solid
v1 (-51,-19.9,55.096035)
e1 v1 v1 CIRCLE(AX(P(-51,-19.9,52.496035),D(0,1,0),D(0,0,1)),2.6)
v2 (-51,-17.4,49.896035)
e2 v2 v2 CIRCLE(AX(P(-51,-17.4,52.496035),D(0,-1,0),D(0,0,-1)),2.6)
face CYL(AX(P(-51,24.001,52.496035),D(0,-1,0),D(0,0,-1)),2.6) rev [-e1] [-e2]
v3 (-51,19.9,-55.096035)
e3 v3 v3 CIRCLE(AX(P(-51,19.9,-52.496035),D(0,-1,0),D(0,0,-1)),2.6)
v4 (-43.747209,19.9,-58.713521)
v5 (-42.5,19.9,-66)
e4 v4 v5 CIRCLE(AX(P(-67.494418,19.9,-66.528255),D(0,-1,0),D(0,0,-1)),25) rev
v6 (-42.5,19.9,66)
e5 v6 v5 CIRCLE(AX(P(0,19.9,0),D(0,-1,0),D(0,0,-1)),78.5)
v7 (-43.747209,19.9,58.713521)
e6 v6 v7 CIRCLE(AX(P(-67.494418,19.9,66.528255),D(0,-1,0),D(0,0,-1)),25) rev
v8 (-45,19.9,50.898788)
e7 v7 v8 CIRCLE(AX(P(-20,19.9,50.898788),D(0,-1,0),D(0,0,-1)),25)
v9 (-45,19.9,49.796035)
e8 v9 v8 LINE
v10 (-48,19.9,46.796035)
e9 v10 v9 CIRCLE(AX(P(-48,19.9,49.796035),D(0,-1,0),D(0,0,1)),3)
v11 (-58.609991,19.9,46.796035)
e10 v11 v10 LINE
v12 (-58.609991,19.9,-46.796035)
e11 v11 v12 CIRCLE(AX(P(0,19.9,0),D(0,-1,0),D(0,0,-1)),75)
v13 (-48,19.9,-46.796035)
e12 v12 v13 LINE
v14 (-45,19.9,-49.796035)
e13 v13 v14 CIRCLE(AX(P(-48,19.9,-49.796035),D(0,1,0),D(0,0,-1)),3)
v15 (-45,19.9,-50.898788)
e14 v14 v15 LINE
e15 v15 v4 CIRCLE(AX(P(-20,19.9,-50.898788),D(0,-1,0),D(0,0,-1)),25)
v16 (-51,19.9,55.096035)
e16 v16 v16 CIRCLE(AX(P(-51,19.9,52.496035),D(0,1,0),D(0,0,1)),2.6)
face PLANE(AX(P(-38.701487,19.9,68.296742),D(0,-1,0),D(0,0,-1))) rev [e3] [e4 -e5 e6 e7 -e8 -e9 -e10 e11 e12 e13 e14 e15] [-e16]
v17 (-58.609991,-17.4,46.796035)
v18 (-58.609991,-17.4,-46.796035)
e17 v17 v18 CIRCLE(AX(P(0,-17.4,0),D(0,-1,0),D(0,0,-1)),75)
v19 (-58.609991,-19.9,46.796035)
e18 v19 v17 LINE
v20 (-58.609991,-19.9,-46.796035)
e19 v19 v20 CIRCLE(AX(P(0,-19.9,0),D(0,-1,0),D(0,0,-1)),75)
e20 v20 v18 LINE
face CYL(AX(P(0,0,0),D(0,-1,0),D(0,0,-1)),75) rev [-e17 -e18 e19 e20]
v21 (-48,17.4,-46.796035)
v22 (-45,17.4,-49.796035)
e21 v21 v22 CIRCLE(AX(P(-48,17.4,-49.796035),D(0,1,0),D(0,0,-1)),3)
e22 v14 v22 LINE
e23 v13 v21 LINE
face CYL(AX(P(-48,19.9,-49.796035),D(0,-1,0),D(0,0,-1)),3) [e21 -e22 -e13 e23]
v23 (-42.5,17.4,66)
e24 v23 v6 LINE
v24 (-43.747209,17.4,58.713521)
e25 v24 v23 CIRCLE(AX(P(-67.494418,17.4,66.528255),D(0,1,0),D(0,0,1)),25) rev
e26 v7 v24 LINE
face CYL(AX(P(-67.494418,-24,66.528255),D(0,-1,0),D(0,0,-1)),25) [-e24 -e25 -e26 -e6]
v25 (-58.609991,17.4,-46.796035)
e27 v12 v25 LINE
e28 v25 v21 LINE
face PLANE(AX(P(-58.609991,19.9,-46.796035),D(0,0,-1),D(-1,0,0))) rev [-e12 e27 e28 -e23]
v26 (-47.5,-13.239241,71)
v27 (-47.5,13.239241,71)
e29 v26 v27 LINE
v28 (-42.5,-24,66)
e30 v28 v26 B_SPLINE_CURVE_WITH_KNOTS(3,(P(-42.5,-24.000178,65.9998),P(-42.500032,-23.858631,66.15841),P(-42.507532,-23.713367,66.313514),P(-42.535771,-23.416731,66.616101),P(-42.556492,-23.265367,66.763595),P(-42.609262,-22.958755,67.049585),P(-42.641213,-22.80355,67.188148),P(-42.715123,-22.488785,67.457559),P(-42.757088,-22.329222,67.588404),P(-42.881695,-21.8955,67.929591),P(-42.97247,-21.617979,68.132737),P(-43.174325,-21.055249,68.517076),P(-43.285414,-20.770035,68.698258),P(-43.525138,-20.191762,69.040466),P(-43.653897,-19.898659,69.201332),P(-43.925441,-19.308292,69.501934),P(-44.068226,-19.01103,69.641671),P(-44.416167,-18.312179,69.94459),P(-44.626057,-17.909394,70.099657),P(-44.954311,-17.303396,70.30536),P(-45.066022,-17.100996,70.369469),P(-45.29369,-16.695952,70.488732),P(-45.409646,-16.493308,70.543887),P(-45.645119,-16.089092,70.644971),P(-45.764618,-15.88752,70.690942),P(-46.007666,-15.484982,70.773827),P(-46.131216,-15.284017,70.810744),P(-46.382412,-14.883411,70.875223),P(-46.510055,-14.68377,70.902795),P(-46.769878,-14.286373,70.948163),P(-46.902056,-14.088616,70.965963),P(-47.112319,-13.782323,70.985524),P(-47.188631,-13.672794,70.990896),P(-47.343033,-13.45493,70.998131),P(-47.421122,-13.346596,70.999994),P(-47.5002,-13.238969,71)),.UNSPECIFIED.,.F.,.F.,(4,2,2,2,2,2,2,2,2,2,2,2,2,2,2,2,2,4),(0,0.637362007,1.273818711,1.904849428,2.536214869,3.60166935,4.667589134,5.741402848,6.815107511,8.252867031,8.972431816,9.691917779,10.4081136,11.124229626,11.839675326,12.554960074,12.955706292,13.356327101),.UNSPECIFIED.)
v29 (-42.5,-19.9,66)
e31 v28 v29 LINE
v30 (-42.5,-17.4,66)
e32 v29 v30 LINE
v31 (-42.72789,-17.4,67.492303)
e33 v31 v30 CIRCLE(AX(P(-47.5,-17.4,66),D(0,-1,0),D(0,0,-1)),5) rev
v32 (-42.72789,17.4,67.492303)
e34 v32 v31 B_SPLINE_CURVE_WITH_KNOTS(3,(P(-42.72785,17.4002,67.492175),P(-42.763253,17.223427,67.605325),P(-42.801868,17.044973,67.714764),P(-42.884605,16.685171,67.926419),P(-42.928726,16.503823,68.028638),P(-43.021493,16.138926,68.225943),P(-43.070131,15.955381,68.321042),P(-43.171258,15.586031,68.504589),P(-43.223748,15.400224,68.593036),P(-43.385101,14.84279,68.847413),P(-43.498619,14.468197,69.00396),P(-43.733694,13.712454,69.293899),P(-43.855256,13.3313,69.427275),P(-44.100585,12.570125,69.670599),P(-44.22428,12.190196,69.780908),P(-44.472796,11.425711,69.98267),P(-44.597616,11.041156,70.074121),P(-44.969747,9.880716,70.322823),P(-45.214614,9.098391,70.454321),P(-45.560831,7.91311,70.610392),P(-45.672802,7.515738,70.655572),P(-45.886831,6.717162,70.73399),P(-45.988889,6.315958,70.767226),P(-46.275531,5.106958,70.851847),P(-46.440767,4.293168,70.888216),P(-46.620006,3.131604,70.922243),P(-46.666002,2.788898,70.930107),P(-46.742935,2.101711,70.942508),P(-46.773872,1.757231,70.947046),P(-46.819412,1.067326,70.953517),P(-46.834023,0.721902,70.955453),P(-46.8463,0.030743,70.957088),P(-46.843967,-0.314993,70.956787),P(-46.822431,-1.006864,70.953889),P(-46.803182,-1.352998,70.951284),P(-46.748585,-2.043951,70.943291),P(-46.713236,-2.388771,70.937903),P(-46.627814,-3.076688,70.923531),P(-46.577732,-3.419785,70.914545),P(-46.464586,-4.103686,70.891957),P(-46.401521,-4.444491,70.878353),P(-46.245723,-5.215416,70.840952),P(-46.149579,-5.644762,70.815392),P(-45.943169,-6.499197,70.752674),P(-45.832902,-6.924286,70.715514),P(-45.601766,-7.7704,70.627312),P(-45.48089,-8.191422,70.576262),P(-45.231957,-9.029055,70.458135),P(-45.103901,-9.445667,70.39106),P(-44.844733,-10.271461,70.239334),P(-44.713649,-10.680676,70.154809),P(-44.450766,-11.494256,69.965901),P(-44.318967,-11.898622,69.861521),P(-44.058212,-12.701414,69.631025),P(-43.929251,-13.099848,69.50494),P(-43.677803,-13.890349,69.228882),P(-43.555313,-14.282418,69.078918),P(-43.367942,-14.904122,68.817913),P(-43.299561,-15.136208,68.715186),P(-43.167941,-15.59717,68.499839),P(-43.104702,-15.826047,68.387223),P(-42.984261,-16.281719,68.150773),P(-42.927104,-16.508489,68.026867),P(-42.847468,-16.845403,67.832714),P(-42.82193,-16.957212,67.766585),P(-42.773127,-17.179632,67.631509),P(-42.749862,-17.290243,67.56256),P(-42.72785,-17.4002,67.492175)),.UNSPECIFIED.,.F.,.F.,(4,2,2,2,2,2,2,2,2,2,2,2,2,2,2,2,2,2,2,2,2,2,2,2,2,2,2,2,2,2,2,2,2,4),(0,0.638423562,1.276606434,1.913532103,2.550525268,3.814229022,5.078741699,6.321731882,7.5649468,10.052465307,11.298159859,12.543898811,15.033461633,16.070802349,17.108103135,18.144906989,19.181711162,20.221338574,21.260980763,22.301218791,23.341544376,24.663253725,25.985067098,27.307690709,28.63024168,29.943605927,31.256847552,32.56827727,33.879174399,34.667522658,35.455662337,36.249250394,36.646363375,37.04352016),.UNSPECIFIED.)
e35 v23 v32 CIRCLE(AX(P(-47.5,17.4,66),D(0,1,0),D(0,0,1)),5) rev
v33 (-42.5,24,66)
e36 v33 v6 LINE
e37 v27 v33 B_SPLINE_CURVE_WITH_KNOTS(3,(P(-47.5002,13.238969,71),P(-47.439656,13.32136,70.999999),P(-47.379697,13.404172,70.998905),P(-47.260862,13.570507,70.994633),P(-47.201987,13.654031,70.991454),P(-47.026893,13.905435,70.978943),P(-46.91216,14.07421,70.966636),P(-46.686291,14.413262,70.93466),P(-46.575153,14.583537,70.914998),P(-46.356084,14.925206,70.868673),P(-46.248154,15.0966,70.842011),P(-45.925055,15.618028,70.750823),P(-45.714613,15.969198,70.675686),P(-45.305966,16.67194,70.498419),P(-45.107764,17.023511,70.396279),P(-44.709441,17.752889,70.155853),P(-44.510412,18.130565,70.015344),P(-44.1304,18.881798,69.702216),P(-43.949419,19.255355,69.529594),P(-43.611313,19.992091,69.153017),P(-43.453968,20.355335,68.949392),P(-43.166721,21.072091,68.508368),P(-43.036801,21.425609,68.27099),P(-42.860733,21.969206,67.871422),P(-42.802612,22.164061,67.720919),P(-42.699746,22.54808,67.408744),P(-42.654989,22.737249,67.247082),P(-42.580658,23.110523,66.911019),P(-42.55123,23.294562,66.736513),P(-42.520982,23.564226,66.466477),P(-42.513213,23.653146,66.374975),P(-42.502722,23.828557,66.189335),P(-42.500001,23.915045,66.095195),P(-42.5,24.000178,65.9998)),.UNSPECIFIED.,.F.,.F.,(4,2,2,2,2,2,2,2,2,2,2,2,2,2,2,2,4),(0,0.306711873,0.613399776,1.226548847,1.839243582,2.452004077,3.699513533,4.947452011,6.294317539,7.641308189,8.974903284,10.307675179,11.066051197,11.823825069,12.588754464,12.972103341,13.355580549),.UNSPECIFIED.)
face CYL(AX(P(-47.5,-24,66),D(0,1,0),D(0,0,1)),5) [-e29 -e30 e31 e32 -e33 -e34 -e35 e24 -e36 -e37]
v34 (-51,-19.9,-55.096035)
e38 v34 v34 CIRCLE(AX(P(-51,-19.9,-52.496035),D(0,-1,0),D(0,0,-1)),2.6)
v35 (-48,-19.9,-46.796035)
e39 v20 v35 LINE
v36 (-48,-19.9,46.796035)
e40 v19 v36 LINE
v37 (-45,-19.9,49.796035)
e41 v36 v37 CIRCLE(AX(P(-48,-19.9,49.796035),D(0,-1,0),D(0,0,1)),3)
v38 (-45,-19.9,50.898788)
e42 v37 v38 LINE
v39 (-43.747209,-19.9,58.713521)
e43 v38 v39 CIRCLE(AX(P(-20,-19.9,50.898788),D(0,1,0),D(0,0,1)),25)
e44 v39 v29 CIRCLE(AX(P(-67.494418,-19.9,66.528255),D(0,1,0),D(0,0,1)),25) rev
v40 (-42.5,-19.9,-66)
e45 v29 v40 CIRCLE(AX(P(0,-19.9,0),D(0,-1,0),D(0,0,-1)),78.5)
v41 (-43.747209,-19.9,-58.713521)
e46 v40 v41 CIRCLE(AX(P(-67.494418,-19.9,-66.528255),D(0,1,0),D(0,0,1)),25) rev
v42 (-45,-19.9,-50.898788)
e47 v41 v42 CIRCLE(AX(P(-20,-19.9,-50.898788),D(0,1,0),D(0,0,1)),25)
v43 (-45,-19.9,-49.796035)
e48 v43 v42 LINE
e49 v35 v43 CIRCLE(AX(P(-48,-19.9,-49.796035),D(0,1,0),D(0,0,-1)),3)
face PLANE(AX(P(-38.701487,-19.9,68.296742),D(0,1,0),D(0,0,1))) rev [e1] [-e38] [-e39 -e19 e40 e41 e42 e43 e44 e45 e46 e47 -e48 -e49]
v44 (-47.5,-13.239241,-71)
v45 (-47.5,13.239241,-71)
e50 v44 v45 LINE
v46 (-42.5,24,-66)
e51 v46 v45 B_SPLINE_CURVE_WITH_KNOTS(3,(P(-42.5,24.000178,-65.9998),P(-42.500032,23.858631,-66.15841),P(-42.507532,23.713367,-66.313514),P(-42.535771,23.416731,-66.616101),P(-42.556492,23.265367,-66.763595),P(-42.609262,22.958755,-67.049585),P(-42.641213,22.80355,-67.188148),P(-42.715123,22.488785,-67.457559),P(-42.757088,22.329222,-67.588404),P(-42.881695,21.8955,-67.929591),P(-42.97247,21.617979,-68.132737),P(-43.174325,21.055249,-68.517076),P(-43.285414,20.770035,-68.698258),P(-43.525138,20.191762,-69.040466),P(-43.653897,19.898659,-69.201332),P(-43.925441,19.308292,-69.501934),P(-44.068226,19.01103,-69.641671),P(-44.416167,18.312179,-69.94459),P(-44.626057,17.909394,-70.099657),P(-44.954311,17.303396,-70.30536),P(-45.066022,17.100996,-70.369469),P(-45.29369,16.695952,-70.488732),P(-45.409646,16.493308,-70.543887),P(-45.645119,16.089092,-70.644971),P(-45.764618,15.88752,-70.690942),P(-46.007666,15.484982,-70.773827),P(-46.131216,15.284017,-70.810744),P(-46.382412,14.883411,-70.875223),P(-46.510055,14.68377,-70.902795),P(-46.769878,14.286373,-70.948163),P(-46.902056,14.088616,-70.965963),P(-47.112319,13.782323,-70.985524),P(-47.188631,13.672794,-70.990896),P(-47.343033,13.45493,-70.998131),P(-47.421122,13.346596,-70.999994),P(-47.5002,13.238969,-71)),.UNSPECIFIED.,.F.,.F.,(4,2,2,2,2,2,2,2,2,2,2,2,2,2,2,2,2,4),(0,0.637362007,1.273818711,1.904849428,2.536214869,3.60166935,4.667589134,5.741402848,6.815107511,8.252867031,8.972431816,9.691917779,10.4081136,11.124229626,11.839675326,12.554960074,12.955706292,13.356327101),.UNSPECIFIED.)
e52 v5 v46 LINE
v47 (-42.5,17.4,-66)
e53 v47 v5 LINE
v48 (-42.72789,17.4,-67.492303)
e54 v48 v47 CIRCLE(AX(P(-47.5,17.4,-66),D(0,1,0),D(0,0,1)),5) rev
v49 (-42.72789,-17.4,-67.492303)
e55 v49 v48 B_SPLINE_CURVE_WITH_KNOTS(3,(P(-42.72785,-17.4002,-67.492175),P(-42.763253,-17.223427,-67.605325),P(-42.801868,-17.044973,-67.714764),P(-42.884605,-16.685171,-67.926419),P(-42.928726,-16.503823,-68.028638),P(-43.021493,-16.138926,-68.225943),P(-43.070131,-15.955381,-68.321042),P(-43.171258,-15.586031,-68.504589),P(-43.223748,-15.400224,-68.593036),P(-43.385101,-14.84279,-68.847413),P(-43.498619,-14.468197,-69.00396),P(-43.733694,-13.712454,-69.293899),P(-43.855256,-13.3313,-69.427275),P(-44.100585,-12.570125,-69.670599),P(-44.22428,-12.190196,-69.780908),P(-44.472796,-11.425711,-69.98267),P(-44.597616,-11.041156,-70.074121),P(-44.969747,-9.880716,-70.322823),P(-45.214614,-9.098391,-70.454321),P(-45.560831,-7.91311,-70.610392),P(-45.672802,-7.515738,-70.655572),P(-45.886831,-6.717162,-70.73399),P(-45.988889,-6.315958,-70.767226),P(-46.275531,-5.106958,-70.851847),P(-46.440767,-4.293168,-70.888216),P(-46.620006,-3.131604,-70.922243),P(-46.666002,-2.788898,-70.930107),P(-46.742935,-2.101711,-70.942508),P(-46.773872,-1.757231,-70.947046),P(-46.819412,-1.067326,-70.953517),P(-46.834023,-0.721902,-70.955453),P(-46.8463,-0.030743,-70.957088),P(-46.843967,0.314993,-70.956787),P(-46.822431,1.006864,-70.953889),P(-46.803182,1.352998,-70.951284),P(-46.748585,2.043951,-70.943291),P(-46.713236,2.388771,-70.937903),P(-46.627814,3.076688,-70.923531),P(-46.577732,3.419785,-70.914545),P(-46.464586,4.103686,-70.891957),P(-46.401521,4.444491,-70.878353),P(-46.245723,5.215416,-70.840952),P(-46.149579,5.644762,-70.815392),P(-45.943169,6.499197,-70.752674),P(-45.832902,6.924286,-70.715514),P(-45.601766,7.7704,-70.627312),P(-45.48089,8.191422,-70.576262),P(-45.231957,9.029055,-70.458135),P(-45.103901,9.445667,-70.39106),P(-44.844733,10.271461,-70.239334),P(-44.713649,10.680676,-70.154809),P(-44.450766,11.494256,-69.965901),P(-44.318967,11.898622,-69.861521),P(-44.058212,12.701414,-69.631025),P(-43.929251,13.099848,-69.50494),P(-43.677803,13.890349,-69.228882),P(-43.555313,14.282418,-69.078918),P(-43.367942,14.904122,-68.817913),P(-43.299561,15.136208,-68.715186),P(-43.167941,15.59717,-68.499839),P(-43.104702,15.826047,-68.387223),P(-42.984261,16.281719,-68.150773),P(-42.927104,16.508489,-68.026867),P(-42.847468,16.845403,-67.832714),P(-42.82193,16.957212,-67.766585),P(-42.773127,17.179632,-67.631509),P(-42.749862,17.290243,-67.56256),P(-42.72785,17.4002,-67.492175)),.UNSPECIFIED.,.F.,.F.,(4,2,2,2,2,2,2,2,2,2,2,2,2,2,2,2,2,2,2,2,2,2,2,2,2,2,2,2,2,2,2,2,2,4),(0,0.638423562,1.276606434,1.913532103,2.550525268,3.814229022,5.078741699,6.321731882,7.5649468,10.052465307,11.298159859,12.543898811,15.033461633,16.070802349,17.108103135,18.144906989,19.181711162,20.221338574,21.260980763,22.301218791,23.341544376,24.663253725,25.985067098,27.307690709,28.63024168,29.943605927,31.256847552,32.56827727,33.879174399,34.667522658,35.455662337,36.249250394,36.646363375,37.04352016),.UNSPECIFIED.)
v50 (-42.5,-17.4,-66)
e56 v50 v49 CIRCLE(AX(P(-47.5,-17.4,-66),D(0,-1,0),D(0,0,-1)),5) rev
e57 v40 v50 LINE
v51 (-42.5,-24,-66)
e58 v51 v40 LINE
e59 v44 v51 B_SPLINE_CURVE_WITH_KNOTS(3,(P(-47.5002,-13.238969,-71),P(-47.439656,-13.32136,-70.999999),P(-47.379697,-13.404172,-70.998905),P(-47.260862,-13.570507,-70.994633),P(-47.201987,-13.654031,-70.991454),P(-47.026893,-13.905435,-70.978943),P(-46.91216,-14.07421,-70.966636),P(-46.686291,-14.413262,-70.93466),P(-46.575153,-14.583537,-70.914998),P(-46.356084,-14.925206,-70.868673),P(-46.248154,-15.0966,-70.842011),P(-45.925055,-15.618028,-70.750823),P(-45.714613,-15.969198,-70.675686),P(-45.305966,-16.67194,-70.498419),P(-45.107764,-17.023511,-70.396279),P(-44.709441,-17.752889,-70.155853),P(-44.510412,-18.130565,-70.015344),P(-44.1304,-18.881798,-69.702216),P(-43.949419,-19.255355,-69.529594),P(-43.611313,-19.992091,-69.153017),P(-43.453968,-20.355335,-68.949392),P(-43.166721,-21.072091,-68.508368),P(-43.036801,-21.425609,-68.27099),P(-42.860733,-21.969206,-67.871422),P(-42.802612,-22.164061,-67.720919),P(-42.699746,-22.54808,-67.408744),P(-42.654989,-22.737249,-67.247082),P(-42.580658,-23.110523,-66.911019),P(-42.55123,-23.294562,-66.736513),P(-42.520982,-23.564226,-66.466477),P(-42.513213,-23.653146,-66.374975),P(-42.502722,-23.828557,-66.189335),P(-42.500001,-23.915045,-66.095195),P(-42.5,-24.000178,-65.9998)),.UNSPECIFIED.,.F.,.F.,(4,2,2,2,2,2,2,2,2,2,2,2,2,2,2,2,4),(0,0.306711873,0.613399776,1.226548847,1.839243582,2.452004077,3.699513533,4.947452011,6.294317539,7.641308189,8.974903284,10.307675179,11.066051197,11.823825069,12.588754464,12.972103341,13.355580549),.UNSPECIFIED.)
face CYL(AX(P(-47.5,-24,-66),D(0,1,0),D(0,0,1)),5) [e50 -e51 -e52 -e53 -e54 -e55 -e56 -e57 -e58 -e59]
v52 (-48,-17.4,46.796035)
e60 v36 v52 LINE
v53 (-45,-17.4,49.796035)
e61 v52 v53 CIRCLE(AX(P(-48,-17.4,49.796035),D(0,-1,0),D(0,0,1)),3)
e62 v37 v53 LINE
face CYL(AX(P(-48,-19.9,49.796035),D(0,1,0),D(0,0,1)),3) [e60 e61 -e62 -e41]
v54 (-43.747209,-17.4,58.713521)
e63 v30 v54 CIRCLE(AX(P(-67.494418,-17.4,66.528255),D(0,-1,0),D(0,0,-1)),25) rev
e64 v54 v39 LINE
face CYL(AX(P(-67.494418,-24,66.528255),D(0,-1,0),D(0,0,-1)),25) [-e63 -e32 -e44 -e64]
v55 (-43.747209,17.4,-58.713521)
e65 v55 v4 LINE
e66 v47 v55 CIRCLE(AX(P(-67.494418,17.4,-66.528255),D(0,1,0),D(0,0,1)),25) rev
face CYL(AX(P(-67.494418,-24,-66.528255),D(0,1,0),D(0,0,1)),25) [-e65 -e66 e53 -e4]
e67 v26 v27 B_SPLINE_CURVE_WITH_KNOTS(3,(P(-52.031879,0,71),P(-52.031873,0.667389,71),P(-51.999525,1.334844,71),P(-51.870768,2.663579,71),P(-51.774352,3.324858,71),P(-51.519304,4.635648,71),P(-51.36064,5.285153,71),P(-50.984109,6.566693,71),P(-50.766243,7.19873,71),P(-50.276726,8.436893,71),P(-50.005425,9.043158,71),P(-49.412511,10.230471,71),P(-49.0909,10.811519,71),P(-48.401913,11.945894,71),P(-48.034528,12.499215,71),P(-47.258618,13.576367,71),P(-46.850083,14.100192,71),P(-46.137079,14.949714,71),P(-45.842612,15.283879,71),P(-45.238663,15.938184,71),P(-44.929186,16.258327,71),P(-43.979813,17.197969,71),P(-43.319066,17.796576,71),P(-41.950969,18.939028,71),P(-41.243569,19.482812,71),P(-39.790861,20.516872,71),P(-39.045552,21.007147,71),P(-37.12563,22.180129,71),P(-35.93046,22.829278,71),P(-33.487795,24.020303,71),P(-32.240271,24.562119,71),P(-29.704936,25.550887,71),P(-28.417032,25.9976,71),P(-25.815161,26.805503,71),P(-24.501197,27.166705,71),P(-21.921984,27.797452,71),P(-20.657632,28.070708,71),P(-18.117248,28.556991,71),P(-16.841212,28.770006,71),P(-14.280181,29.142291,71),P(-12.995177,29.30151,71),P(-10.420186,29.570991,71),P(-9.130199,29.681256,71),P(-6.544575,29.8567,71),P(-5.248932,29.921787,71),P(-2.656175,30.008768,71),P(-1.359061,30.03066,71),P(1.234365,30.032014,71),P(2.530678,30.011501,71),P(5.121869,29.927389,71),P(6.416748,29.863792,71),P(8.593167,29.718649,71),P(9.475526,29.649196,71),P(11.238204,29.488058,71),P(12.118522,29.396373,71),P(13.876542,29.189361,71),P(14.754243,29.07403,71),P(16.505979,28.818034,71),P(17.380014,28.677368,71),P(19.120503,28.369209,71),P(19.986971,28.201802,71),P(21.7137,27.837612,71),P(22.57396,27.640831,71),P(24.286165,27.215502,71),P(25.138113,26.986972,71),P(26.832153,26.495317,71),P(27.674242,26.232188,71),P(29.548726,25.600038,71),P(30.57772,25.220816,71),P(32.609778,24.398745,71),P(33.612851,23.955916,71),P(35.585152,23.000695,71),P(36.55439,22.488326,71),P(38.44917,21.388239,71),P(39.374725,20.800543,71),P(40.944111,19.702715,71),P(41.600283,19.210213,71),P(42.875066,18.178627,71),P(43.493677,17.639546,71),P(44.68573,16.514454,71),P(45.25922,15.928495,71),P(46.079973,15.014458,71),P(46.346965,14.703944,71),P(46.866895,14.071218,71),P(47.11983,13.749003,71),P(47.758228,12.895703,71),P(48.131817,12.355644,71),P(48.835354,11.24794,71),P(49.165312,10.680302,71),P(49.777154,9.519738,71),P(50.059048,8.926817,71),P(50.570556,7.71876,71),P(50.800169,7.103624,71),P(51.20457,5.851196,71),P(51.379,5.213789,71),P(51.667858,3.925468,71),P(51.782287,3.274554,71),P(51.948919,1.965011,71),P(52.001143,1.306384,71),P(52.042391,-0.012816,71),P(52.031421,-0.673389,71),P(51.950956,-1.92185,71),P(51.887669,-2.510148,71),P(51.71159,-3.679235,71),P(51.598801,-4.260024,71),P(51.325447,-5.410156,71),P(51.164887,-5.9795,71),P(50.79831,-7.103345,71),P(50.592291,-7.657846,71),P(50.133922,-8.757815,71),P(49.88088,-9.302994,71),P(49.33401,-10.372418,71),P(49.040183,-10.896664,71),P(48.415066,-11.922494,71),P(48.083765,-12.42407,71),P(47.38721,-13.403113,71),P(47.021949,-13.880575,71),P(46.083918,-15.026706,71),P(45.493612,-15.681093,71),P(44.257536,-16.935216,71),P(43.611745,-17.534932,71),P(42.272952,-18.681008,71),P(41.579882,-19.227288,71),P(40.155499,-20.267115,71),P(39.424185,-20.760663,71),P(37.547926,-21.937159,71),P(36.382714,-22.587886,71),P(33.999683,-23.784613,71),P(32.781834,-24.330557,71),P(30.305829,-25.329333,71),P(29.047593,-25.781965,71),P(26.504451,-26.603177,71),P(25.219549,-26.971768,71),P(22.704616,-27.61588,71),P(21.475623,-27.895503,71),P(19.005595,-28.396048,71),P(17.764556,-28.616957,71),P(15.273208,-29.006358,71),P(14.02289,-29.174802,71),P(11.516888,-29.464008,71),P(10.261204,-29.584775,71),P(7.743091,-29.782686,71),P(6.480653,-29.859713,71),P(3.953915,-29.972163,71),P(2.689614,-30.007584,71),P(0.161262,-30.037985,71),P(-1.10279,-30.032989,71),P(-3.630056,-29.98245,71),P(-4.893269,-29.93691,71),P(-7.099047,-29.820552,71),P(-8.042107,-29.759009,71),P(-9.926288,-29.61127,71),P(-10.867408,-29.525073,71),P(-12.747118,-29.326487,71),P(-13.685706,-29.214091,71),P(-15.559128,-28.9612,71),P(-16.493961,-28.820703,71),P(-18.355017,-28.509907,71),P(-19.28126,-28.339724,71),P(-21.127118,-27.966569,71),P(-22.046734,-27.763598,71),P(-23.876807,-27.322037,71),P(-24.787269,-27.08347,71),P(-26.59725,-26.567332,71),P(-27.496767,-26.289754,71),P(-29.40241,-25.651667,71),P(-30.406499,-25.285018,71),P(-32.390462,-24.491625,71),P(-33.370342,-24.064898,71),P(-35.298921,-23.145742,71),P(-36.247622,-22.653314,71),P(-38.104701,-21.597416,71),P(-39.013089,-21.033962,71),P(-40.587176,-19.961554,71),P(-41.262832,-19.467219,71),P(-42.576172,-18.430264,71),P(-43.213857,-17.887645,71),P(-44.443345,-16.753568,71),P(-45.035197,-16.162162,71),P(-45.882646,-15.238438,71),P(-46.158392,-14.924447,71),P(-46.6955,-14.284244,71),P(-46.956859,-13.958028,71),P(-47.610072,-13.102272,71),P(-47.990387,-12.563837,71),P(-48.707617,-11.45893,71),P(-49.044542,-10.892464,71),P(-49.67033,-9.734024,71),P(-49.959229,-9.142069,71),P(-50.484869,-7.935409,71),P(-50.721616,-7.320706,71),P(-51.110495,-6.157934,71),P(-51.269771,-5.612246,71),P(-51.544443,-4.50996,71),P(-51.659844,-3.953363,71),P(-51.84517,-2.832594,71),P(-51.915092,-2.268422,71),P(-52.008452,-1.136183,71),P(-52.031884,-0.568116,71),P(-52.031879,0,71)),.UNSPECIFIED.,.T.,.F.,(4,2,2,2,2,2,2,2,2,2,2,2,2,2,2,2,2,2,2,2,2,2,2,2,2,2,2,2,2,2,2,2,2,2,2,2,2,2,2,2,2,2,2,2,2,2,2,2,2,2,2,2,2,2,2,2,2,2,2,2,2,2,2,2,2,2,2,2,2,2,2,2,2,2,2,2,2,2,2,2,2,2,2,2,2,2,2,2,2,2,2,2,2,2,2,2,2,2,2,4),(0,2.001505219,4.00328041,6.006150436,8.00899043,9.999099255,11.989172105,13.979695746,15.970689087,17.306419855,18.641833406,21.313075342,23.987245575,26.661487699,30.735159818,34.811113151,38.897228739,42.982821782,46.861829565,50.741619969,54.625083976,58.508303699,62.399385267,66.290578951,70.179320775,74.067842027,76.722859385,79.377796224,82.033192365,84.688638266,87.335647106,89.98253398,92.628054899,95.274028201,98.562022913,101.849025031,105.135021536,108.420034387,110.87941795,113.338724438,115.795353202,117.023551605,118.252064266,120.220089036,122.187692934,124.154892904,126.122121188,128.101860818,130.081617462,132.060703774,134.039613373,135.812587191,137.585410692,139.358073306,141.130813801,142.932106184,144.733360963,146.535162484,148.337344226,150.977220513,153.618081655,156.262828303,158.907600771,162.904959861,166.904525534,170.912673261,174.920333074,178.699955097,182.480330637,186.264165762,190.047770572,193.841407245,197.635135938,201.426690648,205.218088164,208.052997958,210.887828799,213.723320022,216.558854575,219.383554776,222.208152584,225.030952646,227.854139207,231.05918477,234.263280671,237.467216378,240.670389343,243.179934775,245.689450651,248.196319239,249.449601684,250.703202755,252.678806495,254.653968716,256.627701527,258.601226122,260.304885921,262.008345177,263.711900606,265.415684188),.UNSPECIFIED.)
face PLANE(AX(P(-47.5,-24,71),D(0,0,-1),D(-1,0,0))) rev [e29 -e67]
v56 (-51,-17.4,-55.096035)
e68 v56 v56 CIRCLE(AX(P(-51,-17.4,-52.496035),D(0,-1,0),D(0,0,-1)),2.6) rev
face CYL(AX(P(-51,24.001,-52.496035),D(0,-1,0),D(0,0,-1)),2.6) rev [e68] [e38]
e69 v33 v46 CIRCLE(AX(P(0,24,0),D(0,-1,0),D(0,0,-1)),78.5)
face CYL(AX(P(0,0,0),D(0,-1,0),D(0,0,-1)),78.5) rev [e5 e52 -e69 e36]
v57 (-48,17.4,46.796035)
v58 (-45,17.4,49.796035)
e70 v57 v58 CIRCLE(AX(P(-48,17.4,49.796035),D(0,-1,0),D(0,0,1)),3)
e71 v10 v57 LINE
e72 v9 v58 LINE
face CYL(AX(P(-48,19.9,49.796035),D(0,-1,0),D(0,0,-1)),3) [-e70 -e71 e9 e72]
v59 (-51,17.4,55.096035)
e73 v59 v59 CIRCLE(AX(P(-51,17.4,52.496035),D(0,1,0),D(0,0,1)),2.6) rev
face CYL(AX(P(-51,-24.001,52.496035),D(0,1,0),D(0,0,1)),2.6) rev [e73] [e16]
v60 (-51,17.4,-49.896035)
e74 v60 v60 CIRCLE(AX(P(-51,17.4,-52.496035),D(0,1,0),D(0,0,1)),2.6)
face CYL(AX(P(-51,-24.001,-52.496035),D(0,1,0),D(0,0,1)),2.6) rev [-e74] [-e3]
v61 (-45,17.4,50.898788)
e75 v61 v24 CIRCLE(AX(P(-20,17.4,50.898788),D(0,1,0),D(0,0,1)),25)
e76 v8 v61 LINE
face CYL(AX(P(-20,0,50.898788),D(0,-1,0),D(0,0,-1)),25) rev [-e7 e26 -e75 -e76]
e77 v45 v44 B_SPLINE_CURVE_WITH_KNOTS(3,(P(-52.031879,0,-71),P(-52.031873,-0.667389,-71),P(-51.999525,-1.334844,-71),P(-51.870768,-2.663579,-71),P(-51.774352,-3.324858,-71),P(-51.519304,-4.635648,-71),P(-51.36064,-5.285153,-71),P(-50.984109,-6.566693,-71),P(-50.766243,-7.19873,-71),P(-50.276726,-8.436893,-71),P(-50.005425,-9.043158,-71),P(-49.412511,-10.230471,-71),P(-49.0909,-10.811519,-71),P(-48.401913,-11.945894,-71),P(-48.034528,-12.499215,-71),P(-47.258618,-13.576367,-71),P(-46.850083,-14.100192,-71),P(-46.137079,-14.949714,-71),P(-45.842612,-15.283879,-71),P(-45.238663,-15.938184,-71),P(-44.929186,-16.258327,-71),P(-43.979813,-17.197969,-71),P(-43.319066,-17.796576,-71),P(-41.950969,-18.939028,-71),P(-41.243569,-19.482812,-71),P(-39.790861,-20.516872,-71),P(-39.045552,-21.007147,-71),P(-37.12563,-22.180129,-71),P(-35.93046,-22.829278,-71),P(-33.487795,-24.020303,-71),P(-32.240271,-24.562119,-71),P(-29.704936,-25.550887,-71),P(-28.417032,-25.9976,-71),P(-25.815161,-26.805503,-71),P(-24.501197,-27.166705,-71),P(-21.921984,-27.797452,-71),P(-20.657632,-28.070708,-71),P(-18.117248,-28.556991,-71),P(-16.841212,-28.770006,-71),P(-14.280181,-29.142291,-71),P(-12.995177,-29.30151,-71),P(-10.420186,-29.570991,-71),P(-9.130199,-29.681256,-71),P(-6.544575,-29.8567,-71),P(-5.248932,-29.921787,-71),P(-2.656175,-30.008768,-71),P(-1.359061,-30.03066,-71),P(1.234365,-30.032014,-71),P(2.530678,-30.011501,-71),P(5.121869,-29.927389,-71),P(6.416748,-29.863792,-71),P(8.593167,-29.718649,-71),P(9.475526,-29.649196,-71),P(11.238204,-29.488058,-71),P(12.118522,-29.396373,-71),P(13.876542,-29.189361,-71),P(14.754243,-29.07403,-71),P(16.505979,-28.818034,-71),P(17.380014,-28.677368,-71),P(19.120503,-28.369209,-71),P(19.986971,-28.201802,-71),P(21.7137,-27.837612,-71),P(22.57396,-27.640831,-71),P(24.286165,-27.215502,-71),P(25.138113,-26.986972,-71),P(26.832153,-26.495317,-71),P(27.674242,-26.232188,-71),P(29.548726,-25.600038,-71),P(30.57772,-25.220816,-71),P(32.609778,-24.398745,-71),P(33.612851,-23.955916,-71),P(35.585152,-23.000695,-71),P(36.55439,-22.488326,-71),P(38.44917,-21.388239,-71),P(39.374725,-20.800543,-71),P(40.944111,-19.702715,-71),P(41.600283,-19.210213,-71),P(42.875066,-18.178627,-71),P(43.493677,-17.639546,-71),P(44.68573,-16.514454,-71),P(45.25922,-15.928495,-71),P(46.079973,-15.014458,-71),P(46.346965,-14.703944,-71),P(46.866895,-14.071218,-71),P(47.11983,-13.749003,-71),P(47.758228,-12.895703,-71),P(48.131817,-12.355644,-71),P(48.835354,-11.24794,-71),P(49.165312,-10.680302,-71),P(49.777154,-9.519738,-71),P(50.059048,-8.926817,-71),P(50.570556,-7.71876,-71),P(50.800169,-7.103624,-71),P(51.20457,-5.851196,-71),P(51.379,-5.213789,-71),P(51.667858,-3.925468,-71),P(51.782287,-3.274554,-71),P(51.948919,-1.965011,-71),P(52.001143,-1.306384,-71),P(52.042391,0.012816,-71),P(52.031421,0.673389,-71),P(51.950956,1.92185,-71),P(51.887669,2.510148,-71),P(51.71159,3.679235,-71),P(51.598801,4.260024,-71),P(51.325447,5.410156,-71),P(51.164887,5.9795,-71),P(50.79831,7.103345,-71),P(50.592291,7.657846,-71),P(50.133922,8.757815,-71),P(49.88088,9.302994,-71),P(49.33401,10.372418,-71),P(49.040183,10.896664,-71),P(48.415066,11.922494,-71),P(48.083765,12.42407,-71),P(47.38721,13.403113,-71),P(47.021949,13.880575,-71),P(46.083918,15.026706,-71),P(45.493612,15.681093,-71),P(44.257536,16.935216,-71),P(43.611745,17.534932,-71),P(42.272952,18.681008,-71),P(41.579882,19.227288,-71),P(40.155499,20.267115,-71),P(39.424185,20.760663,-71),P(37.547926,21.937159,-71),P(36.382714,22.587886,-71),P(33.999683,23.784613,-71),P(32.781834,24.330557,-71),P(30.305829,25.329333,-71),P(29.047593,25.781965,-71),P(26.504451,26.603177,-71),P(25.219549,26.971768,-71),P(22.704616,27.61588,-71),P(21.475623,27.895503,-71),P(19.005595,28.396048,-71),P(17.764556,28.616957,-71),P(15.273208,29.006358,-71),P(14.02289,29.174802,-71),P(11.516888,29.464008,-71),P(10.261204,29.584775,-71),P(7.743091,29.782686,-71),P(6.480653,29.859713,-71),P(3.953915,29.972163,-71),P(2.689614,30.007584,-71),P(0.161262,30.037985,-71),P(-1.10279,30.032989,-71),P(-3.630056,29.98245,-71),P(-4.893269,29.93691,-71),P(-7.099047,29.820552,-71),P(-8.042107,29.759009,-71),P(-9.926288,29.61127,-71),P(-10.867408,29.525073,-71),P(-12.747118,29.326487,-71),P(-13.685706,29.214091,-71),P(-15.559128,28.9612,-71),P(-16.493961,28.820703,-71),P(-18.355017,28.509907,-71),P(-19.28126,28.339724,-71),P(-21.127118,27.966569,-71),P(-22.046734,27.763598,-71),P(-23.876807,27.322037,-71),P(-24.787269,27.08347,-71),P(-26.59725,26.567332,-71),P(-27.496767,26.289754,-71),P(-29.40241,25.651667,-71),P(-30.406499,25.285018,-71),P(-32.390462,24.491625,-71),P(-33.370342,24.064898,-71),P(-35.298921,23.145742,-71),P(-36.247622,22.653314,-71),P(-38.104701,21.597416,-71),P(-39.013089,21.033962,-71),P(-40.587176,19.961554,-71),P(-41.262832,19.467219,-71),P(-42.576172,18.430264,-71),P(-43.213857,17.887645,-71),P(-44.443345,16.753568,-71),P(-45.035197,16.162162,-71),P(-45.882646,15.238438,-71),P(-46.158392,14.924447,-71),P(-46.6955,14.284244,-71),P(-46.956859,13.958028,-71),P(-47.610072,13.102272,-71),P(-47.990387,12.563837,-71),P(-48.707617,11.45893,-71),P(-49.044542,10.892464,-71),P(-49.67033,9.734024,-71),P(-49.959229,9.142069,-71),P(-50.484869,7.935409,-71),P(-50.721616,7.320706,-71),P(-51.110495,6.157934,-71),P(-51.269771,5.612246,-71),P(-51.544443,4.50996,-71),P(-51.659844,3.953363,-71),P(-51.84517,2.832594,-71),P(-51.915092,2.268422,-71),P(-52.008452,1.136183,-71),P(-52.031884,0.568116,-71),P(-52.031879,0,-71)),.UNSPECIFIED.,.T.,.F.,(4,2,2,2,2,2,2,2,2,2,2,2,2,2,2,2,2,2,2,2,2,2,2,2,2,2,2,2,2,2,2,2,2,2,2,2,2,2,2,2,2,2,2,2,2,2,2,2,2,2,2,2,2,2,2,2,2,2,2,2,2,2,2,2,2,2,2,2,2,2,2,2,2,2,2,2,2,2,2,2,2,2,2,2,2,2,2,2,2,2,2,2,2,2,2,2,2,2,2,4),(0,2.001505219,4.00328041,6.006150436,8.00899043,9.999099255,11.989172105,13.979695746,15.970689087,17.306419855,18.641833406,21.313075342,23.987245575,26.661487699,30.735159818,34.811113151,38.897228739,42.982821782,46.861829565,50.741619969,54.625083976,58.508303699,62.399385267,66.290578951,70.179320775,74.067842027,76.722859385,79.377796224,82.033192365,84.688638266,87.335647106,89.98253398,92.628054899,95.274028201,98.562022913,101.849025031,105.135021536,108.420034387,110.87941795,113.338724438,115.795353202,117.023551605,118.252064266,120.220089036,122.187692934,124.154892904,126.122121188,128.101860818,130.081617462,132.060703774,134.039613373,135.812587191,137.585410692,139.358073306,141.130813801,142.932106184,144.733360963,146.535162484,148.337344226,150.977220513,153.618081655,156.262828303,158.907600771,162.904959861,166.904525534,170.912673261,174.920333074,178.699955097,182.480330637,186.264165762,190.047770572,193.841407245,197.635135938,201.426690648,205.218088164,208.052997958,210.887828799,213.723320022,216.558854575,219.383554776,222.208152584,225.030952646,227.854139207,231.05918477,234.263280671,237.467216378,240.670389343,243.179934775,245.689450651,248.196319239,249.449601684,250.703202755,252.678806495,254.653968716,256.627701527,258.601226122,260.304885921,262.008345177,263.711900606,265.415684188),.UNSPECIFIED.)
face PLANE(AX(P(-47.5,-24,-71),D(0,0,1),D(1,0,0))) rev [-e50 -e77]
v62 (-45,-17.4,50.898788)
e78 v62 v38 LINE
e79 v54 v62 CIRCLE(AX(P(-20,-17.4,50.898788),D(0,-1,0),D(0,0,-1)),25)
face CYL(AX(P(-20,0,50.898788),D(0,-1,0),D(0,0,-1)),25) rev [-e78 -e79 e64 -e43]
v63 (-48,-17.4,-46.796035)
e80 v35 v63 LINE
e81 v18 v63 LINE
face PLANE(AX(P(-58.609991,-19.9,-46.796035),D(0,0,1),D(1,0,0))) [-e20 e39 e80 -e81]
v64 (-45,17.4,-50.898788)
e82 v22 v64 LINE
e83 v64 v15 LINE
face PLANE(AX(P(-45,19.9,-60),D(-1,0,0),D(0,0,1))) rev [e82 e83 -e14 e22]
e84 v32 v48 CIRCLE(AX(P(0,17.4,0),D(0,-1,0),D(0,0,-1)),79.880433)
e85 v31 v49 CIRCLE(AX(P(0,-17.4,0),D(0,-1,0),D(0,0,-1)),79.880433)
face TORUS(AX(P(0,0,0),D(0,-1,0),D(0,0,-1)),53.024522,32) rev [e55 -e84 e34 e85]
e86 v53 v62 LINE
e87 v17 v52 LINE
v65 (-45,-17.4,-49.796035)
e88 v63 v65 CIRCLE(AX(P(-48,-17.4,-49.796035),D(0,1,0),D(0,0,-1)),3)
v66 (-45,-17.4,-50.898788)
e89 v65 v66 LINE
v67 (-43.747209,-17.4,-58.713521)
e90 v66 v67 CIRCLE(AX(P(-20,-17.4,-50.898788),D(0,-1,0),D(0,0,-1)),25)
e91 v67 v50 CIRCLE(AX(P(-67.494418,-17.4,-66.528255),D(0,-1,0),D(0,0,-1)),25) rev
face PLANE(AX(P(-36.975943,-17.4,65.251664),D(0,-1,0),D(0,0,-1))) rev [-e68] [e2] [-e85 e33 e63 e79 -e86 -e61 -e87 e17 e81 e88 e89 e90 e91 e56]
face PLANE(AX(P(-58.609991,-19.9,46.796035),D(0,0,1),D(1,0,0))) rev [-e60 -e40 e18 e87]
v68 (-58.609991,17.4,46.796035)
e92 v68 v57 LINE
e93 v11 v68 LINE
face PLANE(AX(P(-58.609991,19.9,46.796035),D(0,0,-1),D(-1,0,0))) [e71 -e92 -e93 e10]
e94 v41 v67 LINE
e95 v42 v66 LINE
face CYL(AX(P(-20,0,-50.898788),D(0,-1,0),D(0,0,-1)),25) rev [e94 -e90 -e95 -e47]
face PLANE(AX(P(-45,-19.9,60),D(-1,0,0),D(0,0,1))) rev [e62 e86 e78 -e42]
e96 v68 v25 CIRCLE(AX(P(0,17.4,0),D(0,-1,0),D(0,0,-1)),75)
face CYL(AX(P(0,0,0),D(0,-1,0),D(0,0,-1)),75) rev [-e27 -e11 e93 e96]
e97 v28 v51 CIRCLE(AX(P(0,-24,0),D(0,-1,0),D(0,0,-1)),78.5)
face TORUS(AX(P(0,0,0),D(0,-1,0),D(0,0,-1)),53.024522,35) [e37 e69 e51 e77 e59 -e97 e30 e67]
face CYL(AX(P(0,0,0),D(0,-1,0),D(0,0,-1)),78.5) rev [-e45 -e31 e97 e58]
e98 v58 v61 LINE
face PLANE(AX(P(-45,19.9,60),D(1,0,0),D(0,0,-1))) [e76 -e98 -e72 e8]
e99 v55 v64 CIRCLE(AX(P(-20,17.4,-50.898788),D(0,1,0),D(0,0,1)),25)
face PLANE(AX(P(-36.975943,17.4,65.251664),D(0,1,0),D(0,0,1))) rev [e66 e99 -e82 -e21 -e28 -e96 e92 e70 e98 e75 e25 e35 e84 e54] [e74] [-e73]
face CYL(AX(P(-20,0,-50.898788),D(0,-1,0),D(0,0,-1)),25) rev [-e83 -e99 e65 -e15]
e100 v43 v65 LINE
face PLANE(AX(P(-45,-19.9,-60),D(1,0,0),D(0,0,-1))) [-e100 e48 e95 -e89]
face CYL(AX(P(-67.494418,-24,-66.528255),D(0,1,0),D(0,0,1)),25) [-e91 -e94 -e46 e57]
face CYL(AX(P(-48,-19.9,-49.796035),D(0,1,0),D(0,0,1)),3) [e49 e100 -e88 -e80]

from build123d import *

# Parameters (mm, degrees)
REVOLVE1_ANGLE          = 120.922435
CUT_EXTRUDE1_DEPTH      = 120.118916294
CUT_EXTRUDE1_DEPTH_BACK = 120.118916294
BOSS_EXTRUDE2_DEPTH     = 2.5
CUT_EXTRUDE2_REACH      = 123.312
SKETCH5_R               = 2.6
MIRROR4_COPY_1_DEPTH    = 2.5
MIRROR4_COPY_2_REACH    = 123.312
MIRROR4_COPY_2_SKETCH_R = 2.6
FILLET2_R               = 25
FILLET3_START           = -21
FILLET3_DEPTH           = 42


with BuildPart() as part:
    # Revolve1: read off the stored shape, not the designer's step
    # Revolve1 outline → Revolve1 (revolve)
    with BuildSketch(Plane(origin=(0, 0, 0), x_dir=(-0.49301257198087967, 0, -0.8700221858486127), z_dir=(0.8700221858486127, 0, -0.49301257198087967))):
        with BuildLine():
            Line((78.5, 24), (78.5, 19.9))
            Line((78.5, 19.9), (75, 19.9))
            Line((75, 19.9), (75, 17.4))
            Line((75, 17.4), (79.88043342, 17.4))
            ThreePointArc((79.88043342, 17.4), (85.024521594, 0), (79.88043342, -17.4))
            Line((79.88043342, -17.4), (75, -17.4))
            Line((75, -17.4), (75, -19.9))
            Line((75, -19.9), (78.5, -19.9))
            Line((78.5, -19.9), (78.5, -24))
            ThreePointArc((78.5, -24), (88.024521594, 0), (78.5, 24))
        make_face()
    revolve(axis=Axis((0, 0, 0), (0, 1, 0)), revolution_arc=REVOLVE1_ANGLE)

    # Sketch3 → Cut-Extrude1 (cut, two sides: drawn at the far end of the back side and taken through both)
    with BuildSketch(Plane(origin=(0, 0, 0), x_dir=(1, 0, 0), z_dir=(0, 1, 0)).offset(-CUT_EXTRUDE1_DEPTH_BACK)):
        with BuildLine():
            Line((-42.5, -66), (-42.5, 66))
            ThreePointArc((-42.5, 66), (-43.964466094, 69.535533906), (-47.5, 71))
            Line((-47.5, 71), (-70.072780864, 71))
            Line((-70.072780864, 71), (-70.072780864, 87.352336772))
            Line((-70.072780864, 87.352336772), (-35.072780864, 87.352336772))
            Line((-35.072780864, 87.352336772), (-35.072780864, -87.352336772))
            Line((-35.072780864, -87.352336772), (-70.072780864, -87.352336772))
            Line((-70.072780864, -87.352336772), (-70.072780864, -71))
            Line((-70.072780864, -71), (-47.5, -71))
            ThreePointArc((-47.5, -71), (-43.964466094, -69.535533906), (-42.5, -66))
        make_face()
    extrude(amount=CUT_EXTRUDE1_DEPTH + CUT_EXTRUDE1_DEPTH_BACK, mode=Mode.SUBTRACT)

    # Sketch4 → Boss-Extrude2 (add)
    with BuildSketch(Plane.XZ.offset(-17.4)):
        with BuildLine():
            Line((-58.609991163, 46.796035472), (-48, 46.796035472))
            ThreePointArc((-48, 46.796035472), (-45.878679656, 47.674715128), (-45, 49.796035472))
            Line((-45, 49.796035472), (-45, 60))
            ThreePointArc((-45, 60), (-52.223976649, 53.829882621), (-58.609991163, 46.796035472))
        make_face()
    boss_extrude2 = extrude(amount=-BOSS_EXTRUDE2_DEPTH)

    # Sketch5 → Cut-Extrude2 (cut, up to next)
    with BuildSketch(Plane(origin=(0, 19.9, 0), x_dir=(1, 0, 0), z_dir=(0, 1, 0)), mode=Mode.PRIVATE) as cut_extrude2_sk1:
        with Locations(Location((-51, -52.496035472, 0), (0, 0, 270))):
            Circle(SKETCH5_R)
    cut_extrude2_tool1 = extrude(cut_extrude2_sk1.sketch, amount=-CUT_EXTRUDE2_REACH, mode=Mode.PRIVATE) & part.part
    cut_extrude2 = cut_extrude2_tool1.solids().sort_by_distance((-51, 19.9, 52.496035))[0]
    add(cut_extrude2, mode=Mode.SUBTRACT)

    # Mirror3: Boss-Extrude2, Cut-Extrude2 across plane
    add(boss_extrude2.mirror(Plane.XY))
    add(cut_extrude2.mirror(Plane.XY), mode=Mode.SUBTRACT)

    # Mirror4: Boss-Extrude2, Cut-Extrude2 across plane
    add(boss_extrude2.mirror(Plane.ZX))
    add(cut_extrude2.mirror(Plane.ZX), mode=Mode.SUBTRACT)

    # Mirror4 copy 1 sketch → Mirror4 copy 1 (add)
    with BuildSketch(Plane(origin=(0, -17.4, 0), x_dir=(1, 0, 0), z_dir=(0, 1, 0))):
        with BuildLine():
            Line((-58.609991163, 46.796035472), (-48, 46.796035472))
            ThreePointArc((-48, 46.796035472), (-45.878679656, 47.674715128), (-45, 49.796035472))
            Line((-45, 49.796035472), (-45, 60))
            ThreePointArc((-45, 60), (-52.223976649, 53.829882621), (-58.609991163, 46.796035472))
        make_face()
    extrude(amount=-MIRROR4_COPY_1_DEPTH)

    # Mirror4 copy 2 sketch → Mirror4 copy 2 (cut, up to next)
    with BuildSketch(Plane.XZ.offset(19.9), mode=Mode.PRIVATE) as mirror4_copy_2_sk1:
        with Locations(Location((-51, -52.496035472, 0), (0, 0, 270))):
            Circle(MIRROR4_COPY_2_SKETCH_R)
    mirror4_copy_2_tool1 = extrude(mirror4_copy_2_sk1.sketch, amount=-MIRROR4_COPY_2_REACH, mode=Mode.PRIVATE) & part.part
    add(mirror4_copy_2_tool1.solids().sort_by_distance((-51, -19.9, -52.496035))[0], mode=Mode.SUBTRACT)

    # Fillet2
    # the kernel refuses this fillet: 25 mm, written as the material it adds along each edge
    with BuildSketch(Plane(origin=(-45, 17.4, 60), x_dir=(0.8121446027945783, 0, 0.5834562058557923), z_dir=(0, 1, 0)), Plane(origin=(-45, -17.4, -60), x_dir=(0.812144602794579, 0, -0.5834562058557914), z_dir=(0, -1, 0))) as fillet2_piece_1:
        with BuildLine():
            CenterArc((14.993456513, 21.97790526), FILLET2_R, 215.694002743, 25.841932763)
            Line((-5.310158556, 7.391500113), (-5.716230858, 7.09977201))
            Line((-5.716230858, 7.09977201), (-0.406072301, -0.291728103))
            Line((-0.406072301, -0.291728103), (-0.010260898, -0.499894703))
            ThreePointArc((-0.010260898, -0.499894703), (1.539134774, -0.515794569), (2.83996581, -0.439558105))
            Line((2.83996581, -0.439558105), (3.078269549, 0))
        make_face()
    extrude(amount=2.5)
    with BuildSketch(Plane(origin=(-45, -17.4, 60), x_dir=(0.8121446027945783, 0, 0.5834562058557923), z_dir=(0, -1, 0)), Plane(origin=(-45, 17.4, -60), x_dir=(0.812144602794579, 0, -0.5834562058557914), z_dir=(0, 1, 0))) as fillet2_piece_2:
        with BuildLine():
            CenterArc((14.993456513, -21.97790526), FILLET2_R, 118.464064493, 25.841932763)
            Line((-5.310158556, -7.391500113), (-5.716230858, -7.09977201))
            Line((-5.716230858, -7.09977201), (-0.406072301, 0.291728103))
            Line((-0.406072301, 0.291728103), (-0.010260898, 0.499894703))
            ThreePointArc((-0.010260898, 0.499894703), (1.539134774, 0.515794569), (2.83996581, 0.439558105))
            Line((2.83996581, 0.439558105), (3.078269549, 0))
        make_face()
    extrude(amount=2.5)

    # Fillet3: read off the stored shape, not the designer's step
    # Fillet3 outline → Fillet3 (cut)
    with BuildSketch(Plane(origin=(0, 0, 0), x_dir=(1, 0, 0), z_dir=(0, 1, 0)).offset(FILLET3_START)):
        with BuildLine():
            ThreePointArc((-42.5, -61.796035472), (-43.174912338, -60.275537983), (-43.747209157, -58.713521457))
            ThreePointArc((-43.747209157, -58.713521457), (-42.852791856, -62.310406361), (-42.5, -66))
            Line((-42.5, -66), (-42.5, -61.796035472))
        make_face()
        with BuildLine():
            ThreePointArc((-42.5, 66), (-42.852791856, 62.310406361), (-43.747209157, 58.713521457))
            ThreePointArc((-43.747209157, 58.713521457), (-43.174912338, 60.275537983), (-42.5, 61.796035472))
            Line((-42.5, 61.796035472), (-42.5, 66))
        make_face()
    extrude(amount=FILLET3_DEPTH, mode=Mode.SUBTRACT)


solid = part.part
